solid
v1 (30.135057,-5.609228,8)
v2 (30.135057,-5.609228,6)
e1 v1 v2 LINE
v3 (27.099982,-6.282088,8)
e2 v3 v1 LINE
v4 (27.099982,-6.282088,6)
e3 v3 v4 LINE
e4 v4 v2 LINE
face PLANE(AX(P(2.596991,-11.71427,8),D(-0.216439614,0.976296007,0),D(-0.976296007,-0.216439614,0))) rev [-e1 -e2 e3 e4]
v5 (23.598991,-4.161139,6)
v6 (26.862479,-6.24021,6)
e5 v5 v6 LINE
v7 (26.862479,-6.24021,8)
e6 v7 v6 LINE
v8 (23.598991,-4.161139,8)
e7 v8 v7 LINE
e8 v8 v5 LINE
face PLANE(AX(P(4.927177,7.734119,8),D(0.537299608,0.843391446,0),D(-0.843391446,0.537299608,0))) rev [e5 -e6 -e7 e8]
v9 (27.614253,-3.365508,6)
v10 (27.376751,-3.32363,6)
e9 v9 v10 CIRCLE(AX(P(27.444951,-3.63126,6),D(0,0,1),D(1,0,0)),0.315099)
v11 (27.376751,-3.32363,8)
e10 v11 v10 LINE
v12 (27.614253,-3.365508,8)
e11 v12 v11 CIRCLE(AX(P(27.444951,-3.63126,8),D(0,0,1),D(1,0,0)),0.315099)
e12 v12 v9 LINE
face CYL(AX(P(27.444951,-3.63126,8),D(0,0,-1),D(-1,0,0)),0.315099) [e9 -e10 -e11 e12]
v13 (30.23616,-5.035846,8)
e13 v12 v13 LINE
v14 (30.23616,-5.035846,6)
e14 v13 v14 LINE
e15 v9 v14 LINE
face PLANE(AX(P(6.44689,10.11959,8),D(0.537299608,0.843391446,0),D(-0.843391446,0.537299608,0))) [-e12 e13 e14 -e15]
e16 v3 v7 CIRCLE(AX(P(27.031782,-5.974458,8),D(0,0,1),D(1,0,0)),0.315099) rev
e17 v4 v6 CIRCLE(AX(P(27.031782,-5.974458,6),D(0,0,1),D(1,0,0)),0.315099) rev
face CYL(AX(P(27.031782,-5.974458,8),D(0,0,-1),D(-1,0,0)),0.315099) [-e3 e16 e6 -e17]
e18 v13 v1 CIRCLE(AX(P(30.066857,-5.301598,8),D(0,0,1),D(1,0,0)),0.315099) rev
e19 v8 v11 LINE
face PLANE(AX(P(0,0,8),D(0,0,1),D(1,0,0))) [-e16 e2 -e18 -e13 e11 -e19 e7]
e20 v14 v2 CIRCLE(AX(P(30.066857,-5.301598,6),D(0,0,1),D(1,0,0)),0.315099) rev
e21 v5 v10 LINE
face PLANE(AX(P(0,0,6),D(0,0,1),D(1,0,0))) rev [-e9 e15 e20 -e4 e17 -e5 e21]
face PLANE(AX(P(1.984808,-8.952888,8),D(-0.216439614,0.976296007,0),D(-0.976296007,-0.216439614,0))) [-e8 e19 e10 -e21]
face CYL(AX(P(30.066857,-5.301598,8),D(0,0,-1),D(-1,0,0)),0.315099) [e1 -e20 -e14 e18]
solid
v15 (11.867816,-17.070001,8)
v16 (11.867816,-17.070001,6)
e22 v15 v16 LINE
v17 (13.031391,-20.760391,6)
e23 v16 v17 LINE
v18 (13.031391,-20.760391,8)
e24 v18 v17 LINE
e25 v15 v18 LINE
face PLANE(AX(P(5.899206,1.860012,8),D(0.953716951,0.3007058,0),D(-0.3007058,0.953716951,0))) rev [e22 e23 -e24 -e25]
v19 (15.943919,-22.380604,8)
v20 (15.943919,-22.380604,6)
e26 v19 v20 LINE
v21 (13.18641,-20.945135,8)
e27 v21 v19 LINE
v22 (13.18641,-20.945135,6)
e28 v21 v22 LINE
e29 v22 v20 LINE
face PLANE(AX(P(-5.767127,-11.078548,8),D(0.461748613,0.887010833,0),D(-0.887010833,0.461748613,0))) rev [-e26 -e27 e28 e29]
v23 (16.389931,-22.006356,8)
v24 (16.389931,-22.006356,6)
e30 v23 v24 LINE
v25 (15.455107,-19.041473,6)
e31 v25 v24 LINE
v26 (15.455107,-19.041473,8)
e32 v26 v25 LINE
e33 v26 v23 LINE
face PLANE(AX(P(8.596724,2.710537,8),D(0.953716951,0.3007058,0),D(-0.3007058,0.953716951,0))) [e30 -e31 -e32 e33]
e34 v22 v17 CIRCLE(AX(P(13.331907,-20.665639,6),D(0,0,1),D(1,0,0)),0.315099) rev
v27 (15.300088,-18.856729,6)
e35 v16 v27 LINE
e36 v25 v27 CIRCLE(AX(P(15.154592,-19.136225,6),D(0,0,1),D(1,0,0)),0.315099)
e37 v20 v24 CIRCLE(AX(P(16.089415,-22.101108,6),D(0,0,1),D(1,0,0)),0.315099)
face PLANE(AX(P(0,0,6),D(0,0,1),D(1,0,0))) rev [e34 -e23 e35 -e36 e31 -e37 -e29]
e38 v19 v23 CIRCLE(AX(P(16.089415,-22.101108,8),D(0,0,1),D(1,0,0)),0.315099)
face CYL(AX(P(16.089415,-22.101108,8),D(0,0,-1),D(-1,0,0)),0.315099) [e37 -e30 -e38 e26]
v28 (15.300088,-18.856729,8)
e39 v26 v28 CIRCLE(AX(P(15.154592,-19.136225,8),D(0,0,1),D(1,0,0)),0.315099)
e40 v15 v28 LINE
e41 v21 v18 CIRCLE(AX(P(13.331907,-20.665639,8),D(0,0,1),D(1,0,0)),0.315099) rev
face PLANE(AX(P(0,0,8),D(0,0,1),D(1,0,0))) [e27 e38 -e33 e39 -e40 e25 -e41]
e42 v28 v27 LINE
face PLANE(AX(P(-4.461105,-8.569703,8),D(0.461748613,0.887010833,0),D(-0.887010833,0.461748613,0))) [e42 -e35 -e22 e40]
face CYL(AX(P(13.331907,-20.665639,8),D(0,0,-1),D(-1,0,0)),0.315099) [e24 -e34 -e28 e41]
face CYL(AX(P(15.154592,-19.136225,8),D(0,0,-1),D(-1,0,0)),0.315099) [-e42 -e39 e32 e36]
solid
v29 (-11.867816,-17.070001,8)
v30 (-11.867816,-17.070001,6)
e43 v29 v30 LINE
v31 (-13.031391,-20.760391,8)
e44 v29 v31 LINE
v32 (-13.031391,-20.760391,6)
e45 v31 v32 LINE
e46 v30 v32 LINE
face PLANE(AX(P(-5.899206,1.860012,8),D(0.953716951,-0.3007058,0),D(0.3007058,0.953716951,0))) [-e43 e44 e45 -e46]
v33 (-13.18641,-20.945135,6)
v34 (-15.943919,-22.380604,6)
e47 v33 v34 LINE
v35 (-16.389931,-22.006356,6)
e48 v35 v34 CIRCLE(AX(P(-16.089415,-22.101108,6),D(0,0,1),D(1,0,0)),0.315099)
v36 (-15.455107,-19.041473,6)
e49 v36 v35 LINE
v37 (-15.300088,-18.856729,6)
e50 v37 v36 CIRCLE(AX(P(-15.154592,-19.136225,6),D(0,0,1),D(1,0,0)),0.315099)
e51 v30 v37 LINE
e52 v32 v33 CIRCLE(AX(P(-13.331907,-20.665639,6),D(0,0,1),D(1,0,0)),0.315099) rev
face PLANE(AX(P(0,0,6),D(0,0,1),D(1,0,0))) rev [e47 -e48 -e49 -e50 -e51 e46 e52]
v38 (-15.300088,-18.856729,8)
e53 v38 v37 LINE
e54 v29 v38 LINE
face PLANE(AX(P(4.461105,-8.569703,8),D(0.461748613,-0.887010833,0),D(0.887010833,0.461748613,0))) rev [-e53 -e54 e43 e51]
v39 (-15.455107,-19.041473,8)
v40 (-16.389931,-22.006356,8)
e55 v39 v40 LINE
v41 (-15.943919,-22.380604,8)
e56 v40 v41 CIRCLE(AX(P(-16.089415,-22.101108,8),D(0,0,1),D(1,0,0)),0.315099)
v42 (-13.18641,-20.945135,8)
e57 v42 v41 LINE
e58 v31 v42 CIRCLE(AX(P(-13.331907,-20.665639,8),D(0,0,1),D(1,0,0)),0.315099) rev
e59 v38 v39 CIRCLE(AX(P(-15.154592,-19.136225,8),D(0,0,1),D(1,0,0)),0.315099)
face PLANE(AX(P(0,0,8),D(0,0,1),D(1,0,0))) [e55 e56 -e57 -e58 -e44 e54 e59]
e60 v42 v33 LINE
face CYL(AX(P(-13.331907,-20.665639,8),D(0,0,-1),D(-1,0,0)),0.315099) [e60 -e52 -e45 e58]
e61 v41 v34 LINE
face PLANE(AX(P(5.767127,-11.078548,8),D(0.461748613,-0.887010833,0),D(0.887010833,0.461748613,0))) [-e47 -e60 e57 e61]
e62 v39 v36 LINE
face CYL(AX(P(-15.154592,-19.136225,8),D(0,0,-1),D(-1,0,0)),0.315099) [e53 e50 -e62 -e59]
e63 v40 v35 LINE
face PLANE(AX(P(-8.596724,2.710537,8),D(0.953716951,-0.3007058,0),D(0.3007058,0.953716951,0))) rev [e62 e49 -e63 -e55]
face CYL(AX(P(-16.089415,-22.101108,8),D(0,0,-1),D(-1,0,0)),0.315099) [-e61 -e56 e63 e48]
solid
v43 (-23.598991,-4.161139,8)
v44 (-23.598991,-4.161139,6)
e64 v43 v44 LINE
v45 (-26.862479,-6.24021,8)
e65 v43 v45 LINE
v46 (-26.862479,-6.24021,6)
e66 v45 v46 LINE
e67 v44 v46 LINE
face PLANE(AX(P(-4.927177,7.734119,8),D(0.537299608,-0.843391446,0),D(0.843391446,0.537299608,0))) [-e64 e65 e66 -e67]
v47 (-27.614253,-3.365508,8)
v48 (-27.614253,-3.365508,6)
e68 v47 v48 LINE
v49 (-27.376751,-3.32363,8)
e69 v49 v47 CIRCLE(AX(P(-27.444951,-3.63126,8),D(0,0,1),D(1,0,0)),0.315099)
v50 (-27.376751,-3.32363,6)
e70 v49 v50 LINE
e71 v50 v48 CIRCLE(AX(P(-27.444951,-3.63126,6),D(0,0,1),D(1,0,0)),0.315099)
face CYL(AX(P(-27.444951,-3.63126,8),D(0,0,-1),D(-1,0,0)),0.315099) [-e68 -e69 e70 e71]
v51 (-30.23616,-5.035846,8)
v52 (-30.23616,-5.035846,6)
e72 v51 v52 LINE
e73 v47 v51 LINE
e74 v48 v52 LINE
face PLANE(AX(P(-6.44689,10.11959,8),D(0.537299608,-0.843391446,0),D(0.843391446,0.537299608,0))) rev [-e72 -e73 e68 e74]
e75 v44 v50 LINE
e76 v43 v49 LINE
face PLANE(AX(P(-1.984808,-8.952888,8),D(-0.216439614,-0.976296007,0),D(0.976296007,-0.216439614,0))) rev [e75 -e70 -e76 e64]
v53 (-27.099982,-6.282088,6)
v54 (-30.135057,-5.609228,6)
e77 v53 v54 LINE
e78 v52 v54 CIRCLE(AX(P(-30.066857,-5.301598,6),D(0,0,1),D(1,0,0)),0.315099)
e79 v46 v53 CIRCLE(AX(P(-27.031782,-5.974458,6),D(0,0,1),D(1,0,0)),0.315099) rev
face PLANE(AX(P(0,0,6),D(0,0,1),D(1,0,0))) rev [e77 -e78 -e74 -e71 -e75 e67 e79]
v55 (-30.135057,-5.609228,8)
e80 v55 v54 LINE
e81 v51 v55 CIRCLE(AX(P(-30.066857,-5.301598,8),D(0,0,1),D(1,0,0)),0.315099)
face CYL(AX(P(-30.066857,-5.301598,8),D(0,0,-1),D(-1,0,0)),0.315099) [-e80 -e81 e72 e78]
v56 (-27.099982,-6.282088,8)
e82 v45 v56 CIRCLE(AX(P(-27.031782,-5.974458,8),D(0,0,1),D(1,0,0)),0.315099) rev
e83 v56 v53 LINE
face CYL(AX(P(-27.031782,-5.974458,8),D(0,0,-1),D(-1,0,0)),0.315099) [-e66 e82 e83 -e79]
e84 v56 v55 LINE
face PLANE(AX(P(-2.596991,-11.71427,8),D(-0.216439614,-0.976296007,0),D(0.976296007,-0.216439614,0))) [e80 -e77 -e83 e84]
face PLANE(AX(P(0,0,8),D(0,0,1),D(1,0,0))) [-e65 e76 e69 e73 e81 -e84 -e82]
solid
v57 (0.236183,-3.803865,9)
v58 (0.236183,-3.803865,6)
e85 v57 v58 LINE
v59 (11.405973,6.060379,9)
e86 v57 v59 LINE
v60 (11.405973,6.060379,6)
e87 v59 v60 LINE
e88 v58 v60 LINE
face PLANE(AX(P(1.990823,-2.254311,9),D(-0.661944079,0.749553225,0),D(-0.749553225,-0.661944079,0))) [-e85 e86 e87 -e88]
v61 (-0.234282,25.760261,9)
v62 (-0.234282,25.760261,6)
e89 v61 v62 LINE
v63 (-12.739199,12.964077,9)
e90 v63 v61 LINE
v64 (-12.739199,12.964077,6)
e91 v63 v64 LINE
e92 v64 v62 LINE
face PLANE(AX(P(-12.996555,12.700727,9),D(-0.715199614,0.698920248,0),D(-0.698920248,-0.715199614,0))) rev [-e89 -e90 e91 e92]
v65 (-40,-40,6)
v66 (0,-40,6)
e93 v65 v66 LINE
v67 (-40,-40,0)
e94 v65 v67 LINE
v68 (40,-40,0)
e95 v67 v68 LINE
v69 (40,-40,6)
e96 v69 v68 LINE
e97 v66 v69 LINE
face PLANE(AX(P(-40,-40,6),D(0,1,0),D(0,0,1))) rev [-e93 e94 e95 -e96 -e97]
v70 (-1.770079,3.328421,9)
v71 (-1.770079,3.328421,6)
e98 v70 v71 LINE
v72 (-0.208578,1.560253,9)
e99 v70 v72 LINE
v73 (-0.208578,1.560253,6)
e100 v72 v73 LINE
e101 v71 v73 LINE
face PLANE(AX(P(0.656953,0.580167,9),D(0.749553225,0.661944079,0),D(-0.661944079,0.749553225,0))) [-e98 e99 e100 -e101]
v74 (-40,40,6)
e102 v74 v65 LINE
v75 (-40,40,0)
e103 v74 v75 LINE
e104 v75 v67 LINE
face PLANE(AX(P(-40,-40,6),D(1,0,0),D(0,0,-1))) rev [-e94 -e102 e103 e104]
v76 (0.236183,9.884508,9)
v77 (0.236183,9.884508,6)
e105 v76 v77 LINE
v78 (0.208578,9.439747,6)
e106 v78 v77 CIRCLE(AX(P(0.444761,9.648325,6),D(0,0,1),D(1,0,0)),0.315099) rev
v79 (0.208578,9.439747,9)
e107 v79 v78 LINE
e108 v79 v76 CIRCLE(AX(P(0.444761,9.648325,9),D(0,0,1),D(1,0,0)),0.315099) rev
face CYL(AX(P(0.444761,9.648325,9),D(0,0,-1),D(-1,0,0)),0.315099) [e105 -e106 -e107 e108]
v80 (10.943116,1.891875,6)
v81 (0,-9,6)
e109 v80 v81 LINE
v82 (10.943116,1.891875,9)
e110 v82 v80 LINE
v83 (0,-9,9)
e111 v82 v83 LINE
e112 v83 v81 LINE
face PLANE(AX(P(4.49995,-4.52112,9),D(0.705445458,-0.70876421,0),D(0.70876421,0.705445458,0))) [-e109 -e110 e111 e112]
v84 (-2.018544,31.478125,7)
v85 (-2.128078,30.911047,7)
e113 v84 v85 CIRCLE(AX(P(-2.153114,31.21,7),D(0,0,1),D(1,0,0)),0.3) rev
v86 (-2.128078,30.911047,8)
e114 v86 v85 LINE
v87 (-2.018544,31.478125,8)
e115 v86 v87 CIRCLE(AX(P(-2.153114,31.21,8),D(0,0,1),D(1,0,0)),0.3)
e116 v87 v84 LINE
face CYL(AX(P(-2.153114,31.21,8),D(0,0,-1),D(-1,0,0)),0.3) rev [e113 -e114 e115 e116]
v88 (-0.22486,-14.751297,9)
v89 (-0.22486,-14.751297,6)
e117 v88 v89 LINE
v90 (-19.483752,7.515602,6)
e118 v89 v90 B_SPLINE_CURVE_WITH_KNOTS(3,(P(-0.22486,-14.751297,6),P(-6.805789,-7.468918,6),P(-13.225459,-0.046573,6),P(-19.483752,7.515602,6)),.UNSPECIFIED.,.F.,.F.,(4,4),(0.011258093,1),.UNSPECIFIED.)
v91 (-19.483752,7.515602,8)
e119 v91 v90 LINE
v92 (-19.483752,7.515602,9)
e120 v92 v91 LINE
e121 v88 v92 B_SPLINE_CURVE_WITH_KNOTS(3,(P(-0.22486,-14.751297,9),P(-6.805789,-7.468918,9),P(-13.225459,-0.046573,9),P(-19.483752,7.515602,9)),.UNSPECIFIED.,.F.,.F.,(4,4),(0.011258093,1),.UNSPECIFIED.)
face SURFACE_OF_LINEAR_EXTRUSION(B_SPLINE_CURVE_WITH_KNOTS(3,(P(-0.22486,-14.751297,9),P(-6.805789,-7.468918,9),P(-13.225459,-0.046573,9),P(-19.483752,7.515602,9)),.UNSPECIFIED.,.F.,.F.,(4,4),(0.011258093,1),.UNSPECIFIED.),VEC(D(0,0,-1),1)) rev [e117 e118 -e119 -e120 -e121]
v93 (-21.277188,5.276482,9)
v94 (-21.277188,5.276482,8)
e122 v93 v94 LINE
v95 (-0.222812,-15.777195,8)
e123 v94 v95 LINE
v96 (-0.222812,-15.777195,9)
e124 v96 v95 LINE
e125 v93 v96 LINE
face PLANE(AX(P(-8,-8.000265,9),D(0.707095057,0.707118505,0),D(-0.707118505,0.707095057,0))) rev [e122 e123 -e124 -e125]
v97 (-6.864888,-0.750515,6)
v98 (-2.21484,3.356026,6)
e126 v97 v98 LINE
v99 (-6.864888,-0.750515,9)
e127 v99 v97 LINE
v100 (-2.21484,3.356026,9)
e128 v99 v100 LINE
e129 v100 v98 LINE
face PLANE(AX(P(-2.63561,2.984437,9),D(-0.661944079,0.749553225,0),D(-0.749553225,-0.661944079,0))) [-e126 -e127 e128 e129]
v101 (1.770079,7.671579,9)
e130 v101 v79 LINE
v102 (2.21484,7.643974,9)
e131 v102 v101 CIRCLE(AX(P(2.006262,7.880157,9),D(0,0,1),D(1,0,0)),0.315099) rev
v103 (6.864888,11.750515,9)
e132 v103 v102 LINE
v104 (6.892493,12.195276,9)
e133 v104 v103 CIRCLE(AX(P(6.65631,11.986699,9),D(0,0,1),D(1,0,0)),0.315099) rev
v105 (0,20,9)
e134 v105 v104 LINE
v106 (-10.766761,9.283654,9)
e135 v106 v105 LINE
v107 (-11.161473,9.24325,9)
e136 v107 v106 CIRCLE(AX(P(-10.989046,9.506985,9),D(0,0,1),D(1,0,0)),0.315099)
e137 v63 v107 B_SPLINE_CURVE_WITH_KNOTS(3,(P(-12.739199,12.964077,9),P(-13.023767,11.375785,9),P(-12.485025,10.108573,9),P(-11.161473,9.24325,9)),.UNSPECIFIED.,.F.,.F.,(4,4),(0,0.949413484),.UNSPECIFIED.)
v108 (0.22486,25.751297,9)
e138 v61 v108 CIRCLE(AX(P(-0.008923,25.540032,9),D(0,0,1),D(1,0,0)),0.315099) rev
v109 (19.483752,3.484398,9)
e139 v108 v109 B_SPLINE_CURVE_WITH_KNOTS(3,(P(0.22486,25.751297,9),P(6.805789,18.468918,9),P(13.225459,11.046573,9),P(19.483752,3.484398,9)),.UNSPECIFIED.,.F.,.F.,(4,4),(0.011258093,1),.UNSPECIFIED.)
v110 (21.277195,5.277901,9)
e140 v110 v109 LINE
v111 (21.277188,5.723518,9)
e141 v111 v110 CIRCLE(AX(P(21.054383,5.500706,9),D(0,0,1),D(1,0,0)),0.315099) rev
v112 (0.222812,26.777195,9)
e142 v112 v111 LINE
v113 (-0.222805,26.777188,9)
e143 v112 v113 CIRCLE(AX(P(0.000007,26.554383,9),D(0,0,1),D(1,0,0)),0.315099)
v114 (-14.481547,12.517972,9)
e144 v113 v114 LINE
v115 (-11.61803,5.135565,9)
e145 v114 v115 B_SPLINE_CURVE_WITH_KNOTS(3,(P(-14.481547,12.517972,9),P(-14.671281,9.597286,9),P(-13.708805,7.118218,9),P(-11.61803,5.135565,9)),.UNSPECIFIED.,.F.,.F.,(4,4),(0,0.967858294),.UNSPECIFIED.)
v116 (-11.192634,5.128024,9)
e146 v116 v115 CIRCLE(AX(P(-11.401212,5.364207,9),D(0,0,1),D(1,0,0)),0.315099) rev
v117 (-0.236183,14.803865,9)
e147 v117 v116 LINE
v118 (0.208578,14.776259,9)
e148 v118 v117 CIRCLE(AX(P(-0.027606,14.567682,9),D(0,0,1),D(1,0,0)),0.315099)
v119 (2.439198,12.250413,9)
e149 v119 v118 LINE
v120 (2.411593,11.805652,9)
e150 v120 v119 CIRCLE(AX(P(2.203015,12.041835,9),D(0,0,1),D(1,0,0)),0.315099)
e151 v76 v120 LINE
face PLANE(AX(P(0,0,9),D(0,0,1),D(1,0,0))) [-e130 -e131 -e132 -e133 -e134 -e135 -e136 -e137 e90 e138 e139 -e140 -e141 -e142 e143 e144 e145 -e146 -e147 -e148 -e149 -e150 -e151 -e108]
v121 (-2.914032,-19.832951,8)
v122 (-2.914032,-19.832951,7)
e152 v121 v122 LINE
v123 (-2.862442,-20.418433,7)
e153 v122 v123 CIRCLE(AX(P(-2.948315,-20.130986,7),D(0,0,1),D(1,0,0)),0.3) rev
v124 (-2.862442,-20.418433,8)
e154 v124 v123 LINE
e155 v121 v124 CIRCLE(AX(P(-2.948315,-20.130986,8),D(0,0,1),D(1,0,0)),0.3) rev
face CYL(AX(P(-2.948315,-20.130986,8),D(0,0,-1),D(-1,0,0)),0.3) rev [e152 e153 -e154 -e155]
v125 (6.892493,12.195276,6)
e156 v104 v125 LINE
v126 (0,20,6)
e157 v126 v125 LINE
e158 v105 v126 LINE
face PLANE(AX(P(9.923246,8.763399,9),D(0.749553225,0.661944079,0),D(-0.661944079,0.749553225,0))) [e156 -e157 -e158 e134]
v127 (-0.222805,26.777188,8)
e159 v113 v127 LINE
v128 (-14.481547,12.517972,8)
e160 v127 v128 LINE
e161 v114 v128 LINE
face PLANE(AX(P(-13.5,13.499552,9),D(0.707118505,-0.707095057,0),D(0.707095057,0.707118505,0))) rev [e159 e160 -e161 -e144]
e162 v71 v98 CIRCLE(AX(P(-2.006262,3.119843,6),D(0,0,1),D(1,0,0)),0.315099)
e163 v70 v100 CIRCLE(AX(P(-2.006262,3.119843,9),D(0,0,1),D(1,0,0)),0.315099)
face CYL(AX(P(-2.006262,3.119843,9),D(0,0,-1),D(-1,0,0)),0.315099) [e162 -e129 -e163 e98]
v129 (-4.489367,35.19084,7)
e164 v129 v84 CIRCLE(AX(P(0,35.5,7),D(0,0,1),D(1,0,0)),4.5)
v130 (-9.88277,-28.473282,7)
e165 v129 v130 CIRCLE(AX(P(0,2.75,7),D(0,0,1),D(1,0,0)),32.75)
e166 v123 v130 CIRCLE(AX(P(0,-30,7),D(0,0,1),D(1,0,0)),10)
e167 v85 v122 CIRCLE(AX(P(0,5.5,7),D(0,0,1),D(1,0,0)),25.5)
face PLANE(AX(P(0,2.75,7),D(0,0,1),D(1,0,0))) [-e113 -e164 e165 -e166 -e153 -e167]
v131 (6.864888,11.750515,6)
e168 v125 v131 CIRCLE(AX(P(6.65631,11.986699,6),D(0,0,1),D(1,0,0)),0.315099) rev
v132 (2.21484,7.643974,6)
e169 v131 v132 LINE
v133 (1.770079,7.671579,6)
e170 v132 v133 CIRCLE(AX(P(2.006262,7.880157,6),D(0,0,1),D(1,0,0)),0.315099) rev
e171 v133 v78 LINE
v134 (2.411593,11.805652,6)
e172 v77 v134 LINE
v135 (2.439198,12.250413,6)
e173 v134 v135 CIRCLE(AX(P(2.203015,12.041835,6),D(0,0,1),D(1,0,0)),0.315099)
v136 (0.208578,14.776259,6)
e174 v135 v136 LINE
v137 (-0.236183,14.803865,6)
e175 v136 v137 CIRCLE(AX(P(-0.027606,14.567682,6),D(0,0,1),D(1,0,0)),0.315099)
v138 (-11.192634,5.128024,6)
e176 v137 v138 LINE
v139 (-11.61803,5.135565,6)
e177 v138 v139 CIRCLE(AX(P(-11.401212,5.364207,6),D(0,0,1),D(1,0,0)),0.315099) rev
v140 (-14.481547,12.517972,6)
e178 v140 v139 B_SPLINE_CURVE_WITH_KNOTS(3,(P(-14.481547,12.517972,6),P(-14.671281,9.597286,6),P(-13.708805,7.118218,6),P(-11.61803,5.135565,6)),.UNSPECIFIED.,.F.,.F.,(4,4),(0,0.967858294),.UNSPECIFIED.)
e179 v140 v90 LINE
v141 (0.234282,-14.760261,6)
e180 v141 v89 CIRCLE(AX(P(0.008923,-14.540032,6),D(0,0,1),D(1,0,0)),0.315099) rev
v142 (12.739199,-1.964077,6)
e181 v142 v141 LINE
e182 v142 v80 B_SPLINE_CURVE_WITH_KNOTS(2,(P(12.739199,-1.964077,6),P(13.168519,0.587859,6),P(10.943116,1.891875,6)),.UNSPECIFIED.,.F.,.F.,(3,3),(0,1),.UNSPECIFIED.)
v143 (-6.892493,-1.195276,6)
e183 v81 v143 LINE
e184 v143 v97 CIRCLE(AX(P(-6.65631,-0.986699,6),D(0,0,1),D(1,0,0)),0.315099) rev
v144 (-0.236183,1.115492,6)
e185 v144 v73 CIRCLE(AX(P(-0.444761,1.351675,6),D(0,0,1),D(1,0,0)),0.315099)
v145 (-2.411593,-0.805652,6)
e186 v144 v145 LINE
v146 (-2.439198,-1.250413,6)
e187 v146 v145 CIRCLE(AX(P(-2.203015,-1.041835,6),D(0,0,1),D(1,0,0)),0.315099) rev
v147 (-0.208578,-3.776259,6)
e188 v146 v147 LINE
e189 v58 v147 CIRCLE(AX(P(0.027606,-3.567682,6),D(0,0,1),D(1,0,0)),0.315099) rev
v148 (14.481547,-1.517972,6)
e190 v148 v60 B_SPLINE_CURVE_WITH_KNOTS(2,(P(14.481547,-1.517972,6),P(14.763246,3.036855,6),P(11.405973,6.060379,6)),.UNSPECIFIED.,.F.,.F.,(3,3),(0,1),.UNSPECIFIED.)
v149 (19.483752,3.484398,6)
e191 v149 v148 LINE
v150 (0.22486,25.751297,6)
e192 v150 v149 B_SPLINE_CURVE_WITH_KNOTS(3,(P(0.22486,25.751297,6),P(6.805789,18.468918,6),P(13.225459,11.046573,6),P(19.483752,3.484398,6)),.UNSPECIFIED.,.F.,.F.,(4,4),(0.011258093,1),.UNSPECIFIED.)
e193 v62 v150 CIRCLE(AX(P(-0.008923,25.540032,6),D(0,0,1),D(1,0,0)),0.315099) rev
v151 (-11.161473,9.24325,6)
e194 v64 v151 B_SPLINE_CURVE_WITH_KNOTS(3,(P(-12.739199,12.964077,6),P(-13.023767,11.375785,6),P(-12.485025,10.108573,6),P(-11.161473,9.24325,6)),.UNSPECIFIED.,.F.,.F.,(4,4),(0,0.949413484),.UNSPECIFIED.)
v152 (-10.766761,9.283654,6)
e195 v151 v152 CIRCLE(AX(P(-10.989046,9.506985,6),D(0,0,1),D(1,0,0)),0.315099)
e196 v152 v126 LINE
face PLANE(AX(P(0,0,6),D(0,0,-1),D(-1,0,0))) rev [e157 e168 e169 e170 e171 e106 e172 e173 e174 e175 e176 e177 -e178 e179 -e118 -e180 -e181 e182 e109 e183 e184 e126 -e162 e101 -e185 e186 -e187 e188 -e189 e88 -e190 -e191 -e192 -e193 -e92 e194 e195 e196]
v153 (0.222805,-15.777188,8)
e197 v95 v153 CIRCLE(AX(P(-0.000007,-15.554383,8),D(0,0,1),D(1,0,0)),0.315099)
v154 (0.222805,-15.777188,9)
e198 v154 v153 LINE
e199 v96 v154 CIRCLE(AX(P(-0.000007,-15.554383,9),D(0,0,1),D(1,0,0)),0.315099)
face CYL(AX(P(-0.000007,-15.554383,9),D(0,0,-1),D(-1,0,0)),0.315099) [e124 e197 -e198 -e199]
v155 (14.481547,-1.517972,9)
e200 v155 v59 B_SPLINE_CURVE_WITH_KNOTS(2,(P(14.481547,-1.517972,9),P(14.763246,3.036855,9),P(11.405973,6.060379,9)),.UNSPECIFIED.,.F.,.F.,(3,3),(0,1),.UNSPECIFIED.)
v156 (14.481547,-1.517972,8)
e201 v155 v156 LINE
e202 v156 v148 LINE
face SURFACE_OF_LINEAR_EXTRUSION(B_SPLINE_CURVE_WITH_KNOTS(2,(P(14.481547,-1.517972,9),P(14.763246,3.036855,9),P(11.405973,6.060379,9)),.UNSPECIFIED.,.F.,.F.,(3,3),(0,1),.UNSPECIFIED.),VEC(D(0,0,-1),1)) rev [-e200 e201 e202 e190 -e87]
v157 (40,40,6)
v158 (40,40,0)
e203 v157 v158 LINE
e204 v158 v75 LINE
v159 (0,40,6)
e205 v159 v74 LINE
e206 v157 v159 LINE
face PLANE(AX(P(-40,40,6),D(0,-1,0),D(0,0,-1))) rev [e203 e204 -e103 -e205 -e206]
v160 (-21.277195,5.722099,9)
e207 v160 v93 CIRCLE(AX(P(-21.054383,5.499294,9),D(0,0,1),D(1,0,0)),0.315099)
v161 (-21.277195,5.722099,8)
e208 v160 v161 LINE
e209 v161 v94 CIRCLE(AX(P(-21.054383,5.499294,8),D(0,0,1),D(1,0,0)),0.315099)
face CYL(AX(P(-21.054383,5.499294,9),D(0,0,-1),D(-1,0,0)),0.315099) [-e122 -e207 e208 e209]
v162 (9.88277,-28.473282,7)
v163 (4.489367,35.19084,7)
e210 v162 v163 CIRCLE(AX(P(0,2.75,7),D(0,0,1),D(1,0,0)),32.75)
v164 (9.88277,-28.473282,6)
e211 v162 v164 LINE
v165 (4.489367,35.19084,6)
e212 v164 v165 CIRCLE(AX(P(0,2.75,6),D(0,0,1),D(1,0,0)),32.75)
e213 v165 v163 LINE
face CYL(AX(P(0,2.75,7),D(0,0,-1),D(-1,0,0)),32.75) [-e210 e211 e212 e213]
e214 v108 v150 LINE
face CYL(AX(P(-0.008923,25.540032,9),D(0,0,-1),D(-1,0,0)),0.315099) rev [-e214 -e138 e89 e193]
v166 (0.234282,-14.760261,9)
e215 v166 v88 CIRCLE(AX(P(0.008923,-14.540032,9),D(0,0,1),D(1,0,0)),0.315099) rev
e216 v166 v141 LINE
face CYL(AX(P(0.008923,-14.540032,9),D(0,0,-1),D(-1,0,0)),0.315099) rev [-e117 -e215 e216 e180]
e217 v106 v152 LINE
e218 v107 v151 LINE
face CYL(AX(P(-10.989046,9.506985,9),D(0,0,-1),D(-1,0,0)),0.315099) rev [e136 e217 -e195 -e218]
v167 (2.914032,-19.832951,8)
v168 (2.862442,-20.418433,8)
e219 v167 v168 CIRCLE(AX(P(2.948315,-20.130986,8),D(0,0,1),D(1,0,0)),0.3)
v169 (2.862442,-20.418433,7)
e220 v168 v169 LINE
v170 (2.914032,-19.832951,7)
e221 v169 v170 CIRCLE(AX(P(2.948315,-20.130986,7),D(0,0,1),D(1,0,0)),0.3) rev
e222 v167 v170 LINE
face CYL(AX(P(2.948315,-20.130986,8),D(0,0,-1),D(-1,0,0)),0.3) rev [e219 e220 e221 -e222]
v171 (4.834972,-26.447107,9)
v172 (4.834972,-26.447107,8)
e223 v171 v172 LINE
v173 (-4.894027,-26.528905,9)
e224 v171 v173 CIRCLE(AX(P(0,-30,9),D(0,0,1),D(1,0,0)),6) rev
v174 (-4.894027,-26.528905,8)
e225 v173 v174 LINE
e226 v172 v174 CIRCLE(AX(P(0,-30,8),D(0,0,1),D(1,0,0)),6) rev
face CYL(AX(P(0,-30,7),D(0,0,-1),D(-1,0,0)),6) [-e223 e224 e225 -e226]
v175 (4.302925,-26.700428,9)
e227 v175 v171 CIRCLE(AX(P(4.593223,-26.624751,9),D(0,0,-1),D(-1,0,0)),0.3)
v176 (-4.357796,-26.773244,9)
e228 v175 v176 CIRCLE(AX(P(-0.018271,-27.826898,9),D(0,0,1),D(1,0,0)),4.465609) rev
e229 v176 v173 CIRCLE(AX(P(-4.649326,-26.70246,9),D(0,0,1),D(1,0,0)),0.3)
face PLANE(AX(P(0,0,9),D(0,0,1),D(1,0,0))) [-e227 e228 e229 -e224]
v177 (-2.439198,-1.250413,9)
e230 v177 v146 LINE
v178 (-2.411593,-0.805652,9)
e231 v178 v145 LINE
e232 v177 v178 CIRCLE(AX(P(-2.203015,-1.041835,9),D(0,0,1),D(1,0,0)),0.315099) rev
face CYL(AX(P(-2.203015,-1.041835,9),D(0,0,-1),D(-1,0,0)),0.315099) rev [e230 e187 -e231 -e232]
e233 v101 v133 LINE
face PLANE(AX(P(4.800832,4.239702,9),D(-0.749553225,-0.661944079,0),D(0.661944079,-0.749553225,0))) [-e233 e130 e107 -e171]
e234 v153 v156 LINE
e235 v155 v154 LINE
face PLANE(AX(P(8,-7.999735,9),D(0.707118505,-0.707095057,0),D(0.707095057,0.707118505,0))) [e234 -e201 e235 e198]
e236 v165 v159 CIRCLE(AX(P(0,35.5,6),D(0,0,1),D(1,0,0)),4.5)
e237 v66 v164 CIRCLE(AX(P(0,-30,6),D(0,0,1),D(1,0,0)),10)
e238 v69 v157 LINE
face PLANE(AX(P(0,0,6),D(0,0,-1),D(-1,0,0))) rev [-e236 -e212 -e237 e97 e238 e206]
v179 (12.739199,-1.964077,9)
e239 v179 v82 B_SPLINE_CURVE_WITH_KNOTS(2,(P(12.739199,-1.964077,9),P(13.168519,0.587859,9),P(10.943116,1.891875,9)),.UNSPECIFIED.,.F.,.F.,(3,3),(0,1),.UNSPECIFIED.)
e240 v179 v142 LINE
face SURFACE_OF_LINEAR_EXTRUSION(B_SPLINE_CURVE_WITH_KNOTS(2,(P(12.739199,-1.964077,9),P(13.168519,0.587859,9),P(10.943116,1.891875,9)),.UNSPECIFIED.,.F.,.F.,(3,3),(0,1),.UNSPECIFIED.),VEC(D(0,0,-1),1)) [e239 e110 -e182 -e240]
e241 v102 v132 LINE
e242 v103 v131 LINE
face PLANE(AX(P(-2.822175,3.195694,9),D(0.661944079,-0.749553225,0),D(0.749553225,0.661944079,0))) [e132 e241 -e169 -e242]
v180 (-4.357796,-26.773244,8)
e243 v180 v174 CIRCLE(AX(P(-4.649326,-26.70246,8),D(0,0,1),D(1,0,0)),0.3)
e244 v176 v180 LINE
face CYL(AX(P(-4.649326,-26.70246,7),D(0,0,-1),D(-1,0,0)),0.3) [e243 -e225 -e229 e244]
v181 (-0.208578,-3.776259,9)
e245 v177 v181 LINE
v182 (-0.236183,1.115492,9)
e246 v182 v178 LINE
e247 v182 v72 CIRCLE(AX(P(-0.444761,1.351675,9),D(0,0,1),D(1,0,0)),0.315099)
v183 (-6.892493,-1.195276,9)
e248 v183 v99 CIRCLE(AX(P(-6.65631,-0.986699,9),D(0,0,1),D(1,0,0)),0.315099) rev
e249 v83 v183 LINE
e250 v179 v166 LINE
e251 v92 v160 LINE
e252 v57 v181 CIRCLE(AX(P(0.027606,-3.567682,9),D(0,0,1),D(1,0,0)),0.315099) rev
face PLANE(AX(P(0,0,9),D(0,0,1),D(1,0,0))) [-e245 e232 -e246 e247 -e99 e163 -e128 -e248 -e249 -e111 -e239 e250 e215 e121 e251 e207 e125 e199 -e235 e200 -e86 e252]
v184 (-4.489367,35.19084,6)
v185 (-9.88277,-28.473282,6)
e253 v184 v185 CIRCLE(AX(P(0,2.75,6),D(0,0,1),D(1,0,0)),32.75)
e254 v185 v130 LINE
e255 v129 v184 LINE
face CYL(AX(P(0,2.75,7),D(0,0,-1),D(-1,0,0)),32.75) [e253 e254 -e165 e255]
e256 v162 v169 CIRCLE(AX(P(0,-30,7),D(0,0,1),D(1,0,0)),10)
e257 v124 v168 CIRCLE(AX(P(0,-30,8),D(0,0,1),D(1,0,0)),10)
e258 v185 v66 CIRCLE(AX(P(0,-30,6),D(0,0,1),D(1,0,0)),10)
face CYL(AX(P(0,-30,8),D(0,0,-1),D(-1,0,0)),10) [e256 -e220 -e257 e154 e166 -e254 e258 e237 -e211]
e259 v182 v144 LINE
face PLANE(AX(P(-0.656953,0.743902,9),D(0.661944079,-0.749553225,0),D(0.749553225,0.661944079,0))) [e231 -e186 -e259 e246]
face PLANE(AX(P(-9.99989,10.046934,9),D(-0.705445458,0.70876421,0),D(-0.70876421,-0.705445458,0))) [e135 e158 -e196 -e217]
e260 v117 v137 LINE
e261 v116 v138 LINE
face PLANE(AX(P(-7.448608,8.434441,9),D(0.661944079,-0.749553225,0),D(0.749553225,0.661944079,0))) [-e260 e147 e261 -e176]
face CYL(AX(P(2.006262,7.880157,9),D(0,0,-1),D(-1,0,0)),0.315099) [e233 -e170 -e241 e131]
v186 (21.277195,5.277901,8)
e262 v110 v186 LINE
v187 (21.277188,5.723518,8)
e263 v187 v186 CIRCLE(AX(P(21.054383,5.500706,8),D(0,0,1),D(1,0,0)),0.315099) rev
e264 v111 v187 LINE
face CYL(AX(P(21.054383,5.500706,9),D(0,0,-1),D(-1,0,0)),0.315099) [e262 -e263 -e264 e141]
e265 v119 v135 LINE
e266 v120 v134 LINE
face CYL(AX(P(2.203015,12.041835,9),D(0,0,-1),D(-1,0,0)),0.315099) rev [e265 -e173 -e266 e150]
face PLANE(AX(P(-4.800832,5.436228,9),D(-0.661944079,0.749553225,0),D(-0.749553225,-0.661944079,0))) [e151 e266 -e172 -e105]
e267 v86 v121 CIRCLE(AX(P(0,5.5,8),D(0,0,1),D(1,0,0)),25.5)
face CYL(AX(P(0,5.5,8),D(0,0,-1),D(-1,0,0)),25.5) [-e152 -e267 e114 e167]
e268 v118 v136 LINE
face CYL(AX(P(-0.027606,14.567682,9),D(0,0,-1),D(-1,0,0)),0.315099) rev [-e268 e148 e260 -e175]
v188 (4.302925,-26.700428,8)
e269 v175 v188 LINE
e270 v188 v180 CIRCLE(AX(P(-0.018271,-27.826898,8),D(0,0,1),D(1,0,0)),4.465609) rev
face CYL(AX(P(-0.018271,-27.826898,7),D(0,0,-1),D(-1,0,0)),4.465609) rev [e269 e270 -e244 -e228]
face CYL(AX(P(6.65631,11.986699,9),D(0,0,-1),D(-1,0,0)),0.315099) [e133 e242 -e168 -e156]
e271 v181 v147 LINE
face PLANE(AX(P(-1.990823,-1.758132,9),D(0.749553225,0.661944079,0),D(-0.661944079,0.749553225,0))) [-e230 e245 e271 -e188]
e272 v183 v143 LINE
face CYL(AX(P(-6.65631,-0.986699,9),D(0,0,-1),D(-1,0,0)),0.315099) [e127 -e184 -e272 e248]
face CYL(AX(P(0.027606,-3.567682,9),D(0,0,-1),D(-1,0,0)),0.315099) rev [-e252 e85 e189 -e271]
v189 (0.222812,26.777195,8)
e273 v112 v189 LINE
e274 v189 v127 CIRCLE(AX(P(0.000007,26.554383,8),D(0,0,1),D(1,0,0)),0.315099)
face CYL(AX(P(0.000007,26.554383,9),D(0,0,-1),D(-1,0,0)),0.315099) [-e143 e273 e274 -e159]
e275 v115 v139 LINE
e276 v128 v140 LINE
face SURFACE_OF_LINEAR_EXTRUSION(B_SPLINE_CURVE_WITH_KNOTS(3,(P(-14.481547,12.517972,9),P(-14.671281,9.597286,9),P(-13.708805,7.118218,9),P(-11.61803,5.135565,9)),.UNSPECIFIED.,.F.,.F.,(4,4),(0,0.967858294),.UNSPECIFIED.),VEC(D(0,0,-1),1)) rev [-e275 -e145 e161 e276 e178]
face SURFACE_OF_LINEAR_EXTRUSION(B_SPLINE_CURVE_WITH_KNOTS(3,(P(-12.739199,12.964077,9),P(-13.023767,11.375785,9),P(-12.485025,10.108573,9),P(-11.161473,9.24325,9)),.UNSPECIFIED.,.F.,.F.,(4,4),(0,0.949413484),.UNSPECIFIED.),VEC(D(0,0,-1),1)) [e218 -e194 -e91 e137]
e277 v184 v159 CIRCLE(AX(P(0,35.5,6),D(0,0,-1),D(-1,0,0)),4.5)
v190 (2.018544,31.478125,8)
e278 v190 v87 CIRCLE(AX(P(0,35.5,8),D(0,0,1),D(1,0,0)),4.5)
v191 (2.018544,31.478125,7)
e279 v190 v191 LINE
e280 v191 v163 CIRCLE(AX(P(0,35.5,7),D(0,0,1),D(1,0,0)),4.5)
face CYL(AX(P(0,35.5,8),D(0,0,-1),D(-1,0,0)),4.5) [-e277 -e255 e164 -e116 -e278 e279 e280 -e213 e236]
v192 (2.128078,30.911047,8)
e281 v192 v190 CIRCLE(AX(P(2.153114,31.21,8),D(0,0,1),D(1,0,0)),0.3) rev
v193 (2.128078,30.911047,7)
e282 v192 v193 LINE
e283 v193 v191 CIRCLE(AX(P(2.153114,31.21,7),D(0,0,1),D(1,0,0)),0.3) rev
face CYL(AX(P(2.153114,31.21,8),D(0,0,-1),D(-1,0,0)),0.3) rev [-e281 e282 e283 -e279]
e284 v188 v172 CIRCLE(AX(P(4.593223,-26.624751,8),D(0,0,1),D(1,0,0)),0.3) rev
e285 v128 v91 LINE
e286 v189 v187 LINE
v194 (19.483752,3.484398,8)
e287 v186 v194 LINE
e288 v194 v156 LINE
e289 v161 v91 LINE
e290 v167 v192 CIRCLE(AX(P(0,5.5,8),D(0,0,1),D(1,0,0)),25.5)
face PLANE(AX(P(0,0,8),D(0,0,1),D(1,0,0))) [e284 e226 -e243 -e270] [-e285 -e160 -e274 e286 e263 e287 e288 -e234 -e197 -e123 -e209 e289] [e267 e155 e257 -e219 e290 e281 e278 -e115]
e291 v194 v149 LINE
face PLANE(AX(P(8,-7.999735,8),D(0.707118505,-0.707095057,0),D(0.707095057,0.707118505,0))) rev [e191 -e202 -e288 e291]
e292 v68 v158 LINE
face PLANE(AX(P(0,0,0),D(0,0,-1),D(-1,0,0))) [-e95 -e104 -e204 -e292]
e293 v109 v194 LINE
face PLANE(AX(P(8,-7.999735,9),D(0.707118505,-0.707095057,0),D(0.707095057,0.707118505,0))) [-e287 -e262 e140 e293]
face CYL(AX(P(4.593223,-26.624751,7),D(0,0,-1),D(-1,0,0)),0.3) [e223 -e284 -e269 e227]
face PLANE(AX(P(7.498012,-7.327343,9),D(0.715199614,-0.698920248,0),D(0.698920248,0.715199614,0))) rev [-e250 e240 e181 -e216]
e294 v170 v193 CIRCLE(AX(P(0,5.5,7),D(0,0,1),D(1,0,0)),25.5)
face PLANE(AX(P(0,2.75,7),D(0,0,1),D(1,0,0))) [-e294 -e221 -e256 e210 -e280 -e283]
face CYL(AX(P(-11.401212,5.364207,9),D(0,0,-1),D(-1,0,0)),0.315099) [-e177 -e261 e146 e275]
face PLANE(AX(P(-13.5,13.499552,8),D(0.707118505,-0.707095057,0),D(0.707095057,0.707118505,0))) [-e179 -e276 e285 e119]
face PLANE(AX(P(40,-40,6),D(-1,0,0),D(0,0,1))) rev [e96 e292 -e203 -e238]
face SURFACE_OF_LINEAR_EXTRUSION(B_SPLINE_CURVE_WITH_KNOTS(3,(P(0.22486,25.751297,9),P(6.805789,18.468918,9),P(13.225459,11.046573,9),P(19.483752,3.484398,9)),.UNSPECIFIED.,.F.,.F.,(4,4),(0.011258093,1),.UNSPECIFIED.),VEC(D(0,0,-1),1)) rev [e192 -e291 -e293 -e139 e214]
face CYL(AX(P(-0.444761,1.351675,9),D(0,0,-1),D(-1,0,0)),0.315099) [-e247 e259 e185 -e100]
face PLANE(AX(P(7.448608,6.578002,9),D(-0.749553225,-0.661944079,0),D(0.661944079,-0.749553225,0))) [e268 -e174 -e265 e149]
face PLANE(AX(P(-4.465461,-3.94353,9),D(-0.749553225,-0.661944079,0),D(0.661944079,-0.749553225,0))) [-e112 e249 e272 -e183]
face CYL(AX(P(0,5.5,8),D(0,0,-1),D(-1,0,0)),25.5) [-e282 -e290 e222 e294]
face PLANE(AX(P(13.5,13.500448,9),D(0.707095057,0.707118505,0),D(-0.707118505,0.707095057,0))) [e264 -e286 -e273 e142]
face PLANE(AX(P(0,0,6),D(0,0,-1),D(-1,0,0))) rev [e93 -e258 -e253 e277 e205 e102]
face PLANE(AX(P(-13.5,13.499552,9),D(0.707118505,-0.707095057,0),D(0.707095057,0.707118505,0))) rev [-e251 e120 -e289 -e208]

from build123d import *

# Parameters (mm, degrees)
SKETCH_1_W         = 80
SKETCH_1_H         = 80
EXTRUDE_1_DEPTH    = 6
SKETCH_4_R         = 25.5
EXTRUDE_28_DEPTH   = 2
SKETCH_4_14_R      = 4.5
EXTRUDE_36_DEPTH   = 2
SKETCH_4_14_R_2    = 10
EXTRUDE_36_2_DEPTH = 2
EXTRUDE_36_3_DEPTH = 2
EXTRUDE_36_4_DEPTH = 2
EXTRUDE_36_5_DEPTH = 2
EXTRUDE_36_6_DEPTH = 2
EXTRUDE_37_DEPTH   = 3
EXTRUDE_39_DEPTH   = 3
SKETCH_5_R         = 32.75
SKETCH_5_R_2       = 25.5
EXTRUDE_46_DEPTH   = 1
EXTRUDE_49_DEPTH   = 1
EXTRUDE_52_DEPTH   = 2
EXTRUDE_53_DEPTH   = 2
EXTRUDE_54_DEPTH   = 2
EXTRUDE_START      = 1
EXTRUDE_55_DEPTH   = 2


# Read off the part's stored shape, not the designer's step: 凸台-拉伸55
with BuildPart() as part:
    # 草图1 → 凸台-拉伸1 (new body)
    with BuildSketch(Plane.XY):
        Rectangle(SKETCH_1_W, SKETCH_1_H)
    extrude(amount=EXTRUDE_1_DEPTH)

    # 草图4 → 凸台-拉伸28 (add)
    with BuildSketch(Plane.XY.offset(6)):
        with Locations(Location((0, 5.5, 0), (0, 0, 180))):
            Circle(SKETCH_4_R)
        with BuildLine():
            Line((-0.222804873, 26.777187739), (-21.277195127, 5.722099318))
            ThreePointArc((-21.277195127, 5.722099318), (-21.369481763, 5.499289221), (-21.277187739, 5.276482184))
            Line((-21.277187739, 5.276482184), (-0.222812284, -15.777195127))
            ThreePointArc((-0.222812284, -15.777195127), (-2.188e-06, -15.869481763), (0.222804849, -15.777187739))
            Line((0.222804849, -15.777187739), (21.277195104, 5.277900682))
            ThreePointArc((21.277195104, 5.277900682), (21.36948174, 5.500710779), (21.277187716, 5.723517816))
            Line((21.277187716, 5.723517816), (0.222812261, 26.777195127))
            ThreePointArc((0.222812261, 26.777195127), (2.164e-06, 26.869481763), (-0.222804873, 26.777187739))
        make_face(mode=Mode.SUBTRACT)
    extrude(amount=EXTRUDE_28_DEPTH)

    # 草图4<15> → 凸台-拉伸37 (add)
    with BuildSketch(Plane.XY.offset(6)):
        with BuildLine():
            ThreePointArc((0.222812261, 26.777195127), (2.164e-06, 26.869481763), (-0.222804873, 26.777187739))
            Line((-0.222804873, 26.777187739), (-8.153398461, 18.846331171))
            Line((-8.153398461, 18.846331171), (-14.481547304, 12.517972485))
            add(Edge.make_bspline(
                [(-14.481547304, 12.517972485), (-14.671281268, 9.597285815), (-13.708804563, 7.118218354), (-11.618030464, 5.135565229)],
                knots=[0, 0, 0, 0, 0.967858294, 0.967858294, 0.967858294, 0.967858294], degree=3))
            ThreePointArc((-11.618030464, 5.135565229), (-11.406797411, 5.04915788), (-11.19263442, 5.128023881))
            Line((-11.19263442, 5.128023881), (-0.236183394, 14.803864956))
            ThreePointArc((-0.236183394, 14.803864956), (-0.008085477, 14.882175253), (0.208577849, 14.776259411))
            Line((0.208577849, 14.776259411), (2.439198466, 12.250413301))
            ThreePointArc((2.439198466, 12.250413301), (2.517508763, 12.022315384), (2.411592921, 11.805652058))
            Line((2.411592921, 11.805652058), (0.236183394, 9.884508358))
            ThreePointArc((0.236183394, 9.884508358), (0.130267552, 9.667845033), (0.208577849, 9.439747115))
            Line((0.208577849, 9.439747115), (1.77007899, 7.6715793))
            ThreePointArc((1.77007899, 7.6715793), (1.986742316, 7.565663458), (2.214840233, 7.643973755))
            Line((2.214840233, 7.643973755), (6.864887702, 11.750515207))
            ThreePointArc((6.864887702, 11.750515207), (6.970803544, 11.967178533), (6.892493247, 12.19527645))
            Line((6.892493247, 12.19527645), (0, 20))
            Line((0, 20), (-10.766760888, 9.283653907))
            ThreePointArc((-10.766760888, 9.283653907), (-10.956958862, 9.193523834), (-11.161473038, 9.243249591))
            add(Edge.make_bspline(
                [(-12.739199431, 12.964077031), (-13.023767051, 11.375785015), (-12.485025039, 10.108572994), (-11.161473038, 9.243249591)],
                knots=[0, 0, 0, 0, 0.949413484, 0.949413484, 0.949413484, 0.949413484], degree=3))
            Line((-12.739199431, 12.964077031), (-0.234282021, 25.760261044))
            ThreePointArc((-0.234282021, 25.760261044), (-0.002772606, 25.855070903), (0.224859664, 25.75129678))
            add(Edge.make_bspline(
                [(0.224859664, 25.75129678), (6.805789025, 18.468917619), (13.225459434, 11.046572642), (19.483752214, 3.484398322)],
                knots=[0.011258093, 0.011258093, 0.011258093, 0.011258093, 1, 1, 1, 1], degree=3))
            Line((19.483752214, 3.484398322), (21.277195104, 5.277900682))
            ThreePointArc((21.277195104, 5.277900682), (21.36948174, 5.500710779), (21.277187716, 5.723517816))
            Line((21.277187716, 5.723517816), (0.222812261, 26.777195127))
        make_face()
    extrude(amount=EXTRUDE_37_DEPTH)

    # 草图4<17> → 凸台-拉伸39 (add)
    with BuildSketch(Plane.XY.offset(6)):
        with BuildLine():
            add(Edge.make_bspline(
                [(-0.224859664, -14.75129678), (-6.805789024, -7.468917618), (-13.225459435, -0.046572643), (-19.483752214, 7.515601678)],
                knots=[0.011258093, 0.011258093, 0.011258093, 0.011258093, 1, 1, 1, 1], degree=3))
            Line((-19.483752226, 7.51560169), (-21.277195127, 5.722099318))
            ThreePointArc((-21.277195127, 5.722099318), (-21.369481763, 5.499289221), (-21.277187739, 5.276482184))
            Line((-21.277187739, 5.276482184), (-0.222812284, -15.777195127))
            ThreePointArc((-0.222812284, -15.777195127), (-2.188e-06, -15.869481763), (0.222804849, -15.777187739))
            Line((0.222804849, -15.777187739), (14.481547292, -1.517972474))
            add(Edge.make_bspline(
                [(14.481547304, -1.517972485), (14.763245886, 3.03685501), (11.405972883, 6.060379194)],
                knots=[0, 0, 0, 1, 1, 1], degree=2))
            Line((11.405972883, 6.060379194), (0.236183394, -3.803864956))
            ThreePointArc((0.236183394, -3.803864956), (0.008085477, -3.882175253), (-0.208577849, -3.776259411))
            Line((-0.208577849, -3.776259411), (-2.439198466, -1.250413301))
            ThreePointArc((-2.439198466, -1.250413301), (-2.517508763, -1.022315384), (-2.411592921, -0.805652058))
            Line((-2.411592921, -0.805652058), (-0.236183394, 1.115491642))
            ThreePointArc((-0.236183394, 1.115491642), (-0.130267552, 1.332154968), (-0.208577849, 1.560252885))
            Line((-0.208577849, 1.560252885), (-1.77007899, 3.3284207))
            ThreePointArc((-1.77007899, 3.3284207), (-1.986742316, 3.434336542), (-2.214840233, 3.356026245))
            Line((-2.214840233, 3.356026245), (-6.864887702, -0.750515207))
            ThreePointArc((-6.864887702, -0.750515207), (-6.970803544, -0.967178533), (-6.892493247, -1.19527645))
            Line((-6.892493247, -1.19527645), (-1.107936626, -7.745426543))
            Line((-1.107936626, -7.745426543), (0, -9))
            Line((0, -9), (10.943115677, 1.89187511))
            add(Edge.make_bspline(
                [(12.739199431, -1.964077031), (13.168518811, 0.587858851), (10.943115677, 1.89187511)],
                knots=[0, 0, 0, 1, 1, 1], degree=2))
            Line((12.739199431, -1.964077031), (0.234282021, -14.760261044))
            ThreePointArc((0.234282021, -14.760261044), (0.002772606, -14.855070903), (-0.224859664, -14.75129678))
        make_face()
    extrude(amount=EXTRUDE_39_DEPTH)



with BuildPart() as body_2:
    # 草图4<14> → 凸台-拉伸36 (new body)
    with BuildSketch(Plane.XY.offset(6)):
        with Locations((0, 35.5)):
            Circle(SKETCH_4_14_R)
    extrude(amount=EXTRUDE_36_DEPTH)


with BuildPart() as body_3:
    # 草图4<14> → Extrude 36 2 (new body)
    with BuildSketch(Plane.XY.offset(6)):
        with Locations((0, -30)):
            Circle(SKETCH_4_14_R_2)
        with BuildLine():
            ThreePointArc((4.302924706, -26.700427821), (0.019273318, -32.292349048), (-4.357795927, -26.773244316))
            ThreePointArc((-4.357795927, -26.773244316), (-4.524932498, -26.429464628), (-4.894026947, -26.528905038))
            ThreePointArc((-4.894026947, -26.528905038), (0.050444246, -35.999787944), (4.834971562, -26.447106814))
            ThreePointArc((4.834971562, -26.447106814), (4.464257285, -26.353886473), (4.302924706, -26.700427821))
        make_face(mode=Mode.SUBTRACT)
    extrude(amount=EXTRUDE_36_2_DEPTH)


with BuildPart() as body_4:
    # 草图4<14> → Extrude 36 3 (new body)
    with BuildSketch(Plane.XY.offset(6)):
        with BuildLine():
            Line((-23.598991401, -4.161138901), (-27.376750996, -3.323629762))
            ThreePointArc((-27.376750996, -3.323629762), (-27.499667229, -3.320947721), (-27.614253393, -3.365507843))
            Line((-27.614253393, -3.365507843), (-30.23615982, -5.035846454))
            ThreePointArc((-30.23615982, -5.035846454), (-30.377169143, -5.356314517), (-30.13505719, -5.609227963))
            Line((-30.13505719, -5.609227963), (-27.099981617, -6.282088018))
            ThreePointArc((-27.099981617, -6.282088018), (-26.977065384, -6.28477006), (-26.86247922, -6.240209937))
            Line((-26.86247922, -6.240209937), (-23.598991401, -4.161138901))
        make_face()
    extrude(amount=EXTRUDE_36_3_DEPTH)


with BuildPart() as body_5:
    # 草图4<14> → Extrude 36 4 (new body)
    with BuildSketch(Plane.XY.offset(6)):
        with BuildLine():
            Line((-11.867815844, -17.070001043), (-15.300088087, -18.856728881))
            ThreePointArc((-15.300088087, -18.856728881), (-15.395971368, -18.93368335), (-15.455106768, -19.041472951))
            Line((-15.455106768, -19.041472951), (-16.389930653, -22.006355526))
            ThreePointArc((-16.389930653, -22.006355526), (-16.291957161, -22.342487351), (-15.943919015, -22.380603727))
            Line((-15.943919015, -22.380603727), (-13.186410132, -20.945135461))
            ThreePointArc((-13.186410132, -20.945135461), (-13.090526852, -20.868180992), (-13.031391452, -20.760391391))
            Line((-13.031391452, -20.760391391), (-11.867815844, -17.070001043))
        make_face()
    extrude(amount=EXTRUDE_36_4_DEPTH)


with BuildPart() as body_6:
    # 草图4<14> → Extrude 36 5 (new body)
    with BuildSketch(Plane.XY.offset(6)):
        with BuildLine():
            Line((27.614253393, -3.365507843), (30.23615982, -5.035846454))
            ThreePointArc((30.23615982, -5.035846454), (30.377169143, -5.356314517), (30.13505719, -5.609227963))
            Line((30.13505719, -5.609227963), (27.099981617, -6.282088018))
            ThreePointArc((27.099981617, -6.282088018), (26.977065384, -6.28477006), (26.86247922, -6.240209937))
            Line((26.86247922, -6.240209937), (23.598991401, -4.161138901))
            Line((23.598991401, -4.161138901), (27.376750996, -3.323629762))
            ThreePointArc((27.376750996, -3.323629762), (27.499667229, -3.320947721), (27.614253393, -3.365507843))
        make_face()
    extrude(amount=EXTRUDE_36_5_DEPTH)


with BuildPart() as body_7:
    # 草图4<14> → Extrude 36 6 (new body)
    with BuildSketch(Plane.XY.offset(6)):
        with BuildLine():
            Line((13.186410132, -20.945135461), (15.943919015, -22.380603727))
            ThreePointArc((15.943919015, -22.380603727), (16.291957161, -22.342487351), (16.389930653, -22.006355526))
            Line((16.389930653, -22.006355526), (15.455106768, -19.041472951))
            ThreePointArc((15.455106768, -19.041472951), (15.395971368, -18.93368335), (15.300088087, -18.856728881))
            Line((15.300088087, -18.856728881), (11.867815844, -17.070001043))
            Line((11.867815844, -17.070001043), (13.031391452, -20.760391391))
            ThreePointArc((13.031391452, -20.760391391), (13.090526852, -20.868180992), (13.186410132, -20.945135461))
        make_face()
    extrude(amount=EXTRUDE_36_6_DEPTH)


with BuildPart() as body_8:
    # 草图5 → 凸台-拉伸46 (new body)
    with BuildSketch(Plane.XY.offset(6)):
        with Locations((0, 2.75)):
            Circle(SKETCH_5_R)
        with Locations((0, 5.5)):
            Circle(SKETCH_5_R_2, mode=Mode.SUBTRACT)
    extrude(amount=EXTRUDE_46_DEPTH)


with BuildPart() as body_9:
    # 草图4<22> → 凸台-拉伸49 (new body)
    with BuildSketch(Plane.XY.offset(6)):
        with BuildLine():
            ThreePointArc((4.302924706, -26.700427821), (0.019273318, -32.292349048), (-4.357795927, -26.773244316))
            ThreePointArc((-4.357795927, -26.773244316), (-4.524932498, -26.429464628), (-4.894026947, -26.528905038))
            ThreePointArc((-4.894026947, -26.528905038), (0.050444246, -35.999787944), (4.834971562, -26.447106814))
            ThreePointArc((4.834971562, -26.447106814), (4.464257285, -26.353886473), (4.302924706, -26.700427821))
        make_face()
    extrude(amount=EXTRUDE_49_DEPTH)


with BuildPart() as part_1:
    add(part.part)

    add(body_2.part)  # 凸台-拉伸52 merges body 2

    add(body_8.part)  # 凸台-拉伸52 merges body 8
    # 草图4<24> → 凸台-拉伸52 (add)
    with BuildSketch(Plane.XY.offset(6)):
        with BuildLine():
            ThreePointArc((2.018544397, 31.478125), (1.037198751, 31.121162397), (0, 31))
            ThreePointArc((0, 31), (1.064968064, 30.977751922), (2.128077814, 30.911046512))
            ThreePointArc((2.128077814, 30.911046512), (1.858558412, 31.153105437), (2.018544397, 31.478125))
        make_face()
    extrude(amount=EXTRUDE_52_DEPTH)

    # 草图4<25> → 凸台-拉伸53 (add)
    with BuildSketch(Plane.XY.offset(6)):
        with BuildLine():
            ThreePointArc((-2.018544397, 31.478125), (-1.858558412, 31.153105437), (-2.128077814, 30.911046512))
            ThreePointArc((-2.128077814, 30.911046512), (-1.064968064, 30.977751922), (0, 31))
            ThreePointArc((0, 31), (-1.037198751, 31.121162397), (-2.018544397, 31.478125))
        make_face()
    extrude(amount=EXTRUDE_53_DEPTH)


    add(body_3.part)  # 凸台-拉伸54 merges body 3
    # 草图4<26> → 凸台-拉伸54 (add)
    with BuildSketch(Plane.XY.offset(6)):
        with BuildLine():
            ThreePointArc((2.6e-08, -20), (-1.459408174, -19.958203546), (-2.914032211, -19.832951196))
            ThreePointArc((-2.914032211, -19.832951196), (-2.649472878, -20.104653041), (-2.862441692, -20.418432928))
            ThreePointArc((-2.862441692, -20.418432928), (-1.446431678, -20.105161174), (2.6e-08, -20))
        make_face()
        with BuildLine():
            ThreePointArc((2.914032211, -19.832951196), (1.4594082, -19.958203544), (2.6e-08, -20))
            ThreePointArc((2.6e-08, -20), (1.446431705, -20.105161177), (2.862441692, -20.418432928))
            ThreePointArc((2.862441692, -20.418432928), (2.649472878, -20.104653041), (2.914032211, -19.832951196))
        make_face()
    extrude(amount=EXTRUDE_54_DEPTH)


    add(body_9.part)  # 凸台-拉伸55 merges body 9
    # 凸台-拉伸55 outline → 凸台-拉伸55 (add)
    with BuildSketch(Plane.XY.offset(6).offset(EXTRUDE_START)):
        with BuildLine():
            ThreePointArc((4.834971562, -26.447106814), (4.464257285, -26.353886473), (4.302924706, -26.700427821))
            ThreePointArc((4.302924706, -26.700427821), (0.019273318, -32.292349048), (-4.357795927, -26.773244316))
            ThreePointArc((-4.357795927, -26.773244316), (-4.524932498, -26.429464628), (-4.894026947, -26.528905038))
            ThreePointArc((-4.894026947, -26.528905038), (0.050444247, -35.999787944), (4.834971562, -26.447106814))
        make_face()
    extrude(amount=EXTRUDE_55_DEPTH)


solid = Compound([body_4.part, body_5.part, body_6.part, body_7.part, part_1.part])
